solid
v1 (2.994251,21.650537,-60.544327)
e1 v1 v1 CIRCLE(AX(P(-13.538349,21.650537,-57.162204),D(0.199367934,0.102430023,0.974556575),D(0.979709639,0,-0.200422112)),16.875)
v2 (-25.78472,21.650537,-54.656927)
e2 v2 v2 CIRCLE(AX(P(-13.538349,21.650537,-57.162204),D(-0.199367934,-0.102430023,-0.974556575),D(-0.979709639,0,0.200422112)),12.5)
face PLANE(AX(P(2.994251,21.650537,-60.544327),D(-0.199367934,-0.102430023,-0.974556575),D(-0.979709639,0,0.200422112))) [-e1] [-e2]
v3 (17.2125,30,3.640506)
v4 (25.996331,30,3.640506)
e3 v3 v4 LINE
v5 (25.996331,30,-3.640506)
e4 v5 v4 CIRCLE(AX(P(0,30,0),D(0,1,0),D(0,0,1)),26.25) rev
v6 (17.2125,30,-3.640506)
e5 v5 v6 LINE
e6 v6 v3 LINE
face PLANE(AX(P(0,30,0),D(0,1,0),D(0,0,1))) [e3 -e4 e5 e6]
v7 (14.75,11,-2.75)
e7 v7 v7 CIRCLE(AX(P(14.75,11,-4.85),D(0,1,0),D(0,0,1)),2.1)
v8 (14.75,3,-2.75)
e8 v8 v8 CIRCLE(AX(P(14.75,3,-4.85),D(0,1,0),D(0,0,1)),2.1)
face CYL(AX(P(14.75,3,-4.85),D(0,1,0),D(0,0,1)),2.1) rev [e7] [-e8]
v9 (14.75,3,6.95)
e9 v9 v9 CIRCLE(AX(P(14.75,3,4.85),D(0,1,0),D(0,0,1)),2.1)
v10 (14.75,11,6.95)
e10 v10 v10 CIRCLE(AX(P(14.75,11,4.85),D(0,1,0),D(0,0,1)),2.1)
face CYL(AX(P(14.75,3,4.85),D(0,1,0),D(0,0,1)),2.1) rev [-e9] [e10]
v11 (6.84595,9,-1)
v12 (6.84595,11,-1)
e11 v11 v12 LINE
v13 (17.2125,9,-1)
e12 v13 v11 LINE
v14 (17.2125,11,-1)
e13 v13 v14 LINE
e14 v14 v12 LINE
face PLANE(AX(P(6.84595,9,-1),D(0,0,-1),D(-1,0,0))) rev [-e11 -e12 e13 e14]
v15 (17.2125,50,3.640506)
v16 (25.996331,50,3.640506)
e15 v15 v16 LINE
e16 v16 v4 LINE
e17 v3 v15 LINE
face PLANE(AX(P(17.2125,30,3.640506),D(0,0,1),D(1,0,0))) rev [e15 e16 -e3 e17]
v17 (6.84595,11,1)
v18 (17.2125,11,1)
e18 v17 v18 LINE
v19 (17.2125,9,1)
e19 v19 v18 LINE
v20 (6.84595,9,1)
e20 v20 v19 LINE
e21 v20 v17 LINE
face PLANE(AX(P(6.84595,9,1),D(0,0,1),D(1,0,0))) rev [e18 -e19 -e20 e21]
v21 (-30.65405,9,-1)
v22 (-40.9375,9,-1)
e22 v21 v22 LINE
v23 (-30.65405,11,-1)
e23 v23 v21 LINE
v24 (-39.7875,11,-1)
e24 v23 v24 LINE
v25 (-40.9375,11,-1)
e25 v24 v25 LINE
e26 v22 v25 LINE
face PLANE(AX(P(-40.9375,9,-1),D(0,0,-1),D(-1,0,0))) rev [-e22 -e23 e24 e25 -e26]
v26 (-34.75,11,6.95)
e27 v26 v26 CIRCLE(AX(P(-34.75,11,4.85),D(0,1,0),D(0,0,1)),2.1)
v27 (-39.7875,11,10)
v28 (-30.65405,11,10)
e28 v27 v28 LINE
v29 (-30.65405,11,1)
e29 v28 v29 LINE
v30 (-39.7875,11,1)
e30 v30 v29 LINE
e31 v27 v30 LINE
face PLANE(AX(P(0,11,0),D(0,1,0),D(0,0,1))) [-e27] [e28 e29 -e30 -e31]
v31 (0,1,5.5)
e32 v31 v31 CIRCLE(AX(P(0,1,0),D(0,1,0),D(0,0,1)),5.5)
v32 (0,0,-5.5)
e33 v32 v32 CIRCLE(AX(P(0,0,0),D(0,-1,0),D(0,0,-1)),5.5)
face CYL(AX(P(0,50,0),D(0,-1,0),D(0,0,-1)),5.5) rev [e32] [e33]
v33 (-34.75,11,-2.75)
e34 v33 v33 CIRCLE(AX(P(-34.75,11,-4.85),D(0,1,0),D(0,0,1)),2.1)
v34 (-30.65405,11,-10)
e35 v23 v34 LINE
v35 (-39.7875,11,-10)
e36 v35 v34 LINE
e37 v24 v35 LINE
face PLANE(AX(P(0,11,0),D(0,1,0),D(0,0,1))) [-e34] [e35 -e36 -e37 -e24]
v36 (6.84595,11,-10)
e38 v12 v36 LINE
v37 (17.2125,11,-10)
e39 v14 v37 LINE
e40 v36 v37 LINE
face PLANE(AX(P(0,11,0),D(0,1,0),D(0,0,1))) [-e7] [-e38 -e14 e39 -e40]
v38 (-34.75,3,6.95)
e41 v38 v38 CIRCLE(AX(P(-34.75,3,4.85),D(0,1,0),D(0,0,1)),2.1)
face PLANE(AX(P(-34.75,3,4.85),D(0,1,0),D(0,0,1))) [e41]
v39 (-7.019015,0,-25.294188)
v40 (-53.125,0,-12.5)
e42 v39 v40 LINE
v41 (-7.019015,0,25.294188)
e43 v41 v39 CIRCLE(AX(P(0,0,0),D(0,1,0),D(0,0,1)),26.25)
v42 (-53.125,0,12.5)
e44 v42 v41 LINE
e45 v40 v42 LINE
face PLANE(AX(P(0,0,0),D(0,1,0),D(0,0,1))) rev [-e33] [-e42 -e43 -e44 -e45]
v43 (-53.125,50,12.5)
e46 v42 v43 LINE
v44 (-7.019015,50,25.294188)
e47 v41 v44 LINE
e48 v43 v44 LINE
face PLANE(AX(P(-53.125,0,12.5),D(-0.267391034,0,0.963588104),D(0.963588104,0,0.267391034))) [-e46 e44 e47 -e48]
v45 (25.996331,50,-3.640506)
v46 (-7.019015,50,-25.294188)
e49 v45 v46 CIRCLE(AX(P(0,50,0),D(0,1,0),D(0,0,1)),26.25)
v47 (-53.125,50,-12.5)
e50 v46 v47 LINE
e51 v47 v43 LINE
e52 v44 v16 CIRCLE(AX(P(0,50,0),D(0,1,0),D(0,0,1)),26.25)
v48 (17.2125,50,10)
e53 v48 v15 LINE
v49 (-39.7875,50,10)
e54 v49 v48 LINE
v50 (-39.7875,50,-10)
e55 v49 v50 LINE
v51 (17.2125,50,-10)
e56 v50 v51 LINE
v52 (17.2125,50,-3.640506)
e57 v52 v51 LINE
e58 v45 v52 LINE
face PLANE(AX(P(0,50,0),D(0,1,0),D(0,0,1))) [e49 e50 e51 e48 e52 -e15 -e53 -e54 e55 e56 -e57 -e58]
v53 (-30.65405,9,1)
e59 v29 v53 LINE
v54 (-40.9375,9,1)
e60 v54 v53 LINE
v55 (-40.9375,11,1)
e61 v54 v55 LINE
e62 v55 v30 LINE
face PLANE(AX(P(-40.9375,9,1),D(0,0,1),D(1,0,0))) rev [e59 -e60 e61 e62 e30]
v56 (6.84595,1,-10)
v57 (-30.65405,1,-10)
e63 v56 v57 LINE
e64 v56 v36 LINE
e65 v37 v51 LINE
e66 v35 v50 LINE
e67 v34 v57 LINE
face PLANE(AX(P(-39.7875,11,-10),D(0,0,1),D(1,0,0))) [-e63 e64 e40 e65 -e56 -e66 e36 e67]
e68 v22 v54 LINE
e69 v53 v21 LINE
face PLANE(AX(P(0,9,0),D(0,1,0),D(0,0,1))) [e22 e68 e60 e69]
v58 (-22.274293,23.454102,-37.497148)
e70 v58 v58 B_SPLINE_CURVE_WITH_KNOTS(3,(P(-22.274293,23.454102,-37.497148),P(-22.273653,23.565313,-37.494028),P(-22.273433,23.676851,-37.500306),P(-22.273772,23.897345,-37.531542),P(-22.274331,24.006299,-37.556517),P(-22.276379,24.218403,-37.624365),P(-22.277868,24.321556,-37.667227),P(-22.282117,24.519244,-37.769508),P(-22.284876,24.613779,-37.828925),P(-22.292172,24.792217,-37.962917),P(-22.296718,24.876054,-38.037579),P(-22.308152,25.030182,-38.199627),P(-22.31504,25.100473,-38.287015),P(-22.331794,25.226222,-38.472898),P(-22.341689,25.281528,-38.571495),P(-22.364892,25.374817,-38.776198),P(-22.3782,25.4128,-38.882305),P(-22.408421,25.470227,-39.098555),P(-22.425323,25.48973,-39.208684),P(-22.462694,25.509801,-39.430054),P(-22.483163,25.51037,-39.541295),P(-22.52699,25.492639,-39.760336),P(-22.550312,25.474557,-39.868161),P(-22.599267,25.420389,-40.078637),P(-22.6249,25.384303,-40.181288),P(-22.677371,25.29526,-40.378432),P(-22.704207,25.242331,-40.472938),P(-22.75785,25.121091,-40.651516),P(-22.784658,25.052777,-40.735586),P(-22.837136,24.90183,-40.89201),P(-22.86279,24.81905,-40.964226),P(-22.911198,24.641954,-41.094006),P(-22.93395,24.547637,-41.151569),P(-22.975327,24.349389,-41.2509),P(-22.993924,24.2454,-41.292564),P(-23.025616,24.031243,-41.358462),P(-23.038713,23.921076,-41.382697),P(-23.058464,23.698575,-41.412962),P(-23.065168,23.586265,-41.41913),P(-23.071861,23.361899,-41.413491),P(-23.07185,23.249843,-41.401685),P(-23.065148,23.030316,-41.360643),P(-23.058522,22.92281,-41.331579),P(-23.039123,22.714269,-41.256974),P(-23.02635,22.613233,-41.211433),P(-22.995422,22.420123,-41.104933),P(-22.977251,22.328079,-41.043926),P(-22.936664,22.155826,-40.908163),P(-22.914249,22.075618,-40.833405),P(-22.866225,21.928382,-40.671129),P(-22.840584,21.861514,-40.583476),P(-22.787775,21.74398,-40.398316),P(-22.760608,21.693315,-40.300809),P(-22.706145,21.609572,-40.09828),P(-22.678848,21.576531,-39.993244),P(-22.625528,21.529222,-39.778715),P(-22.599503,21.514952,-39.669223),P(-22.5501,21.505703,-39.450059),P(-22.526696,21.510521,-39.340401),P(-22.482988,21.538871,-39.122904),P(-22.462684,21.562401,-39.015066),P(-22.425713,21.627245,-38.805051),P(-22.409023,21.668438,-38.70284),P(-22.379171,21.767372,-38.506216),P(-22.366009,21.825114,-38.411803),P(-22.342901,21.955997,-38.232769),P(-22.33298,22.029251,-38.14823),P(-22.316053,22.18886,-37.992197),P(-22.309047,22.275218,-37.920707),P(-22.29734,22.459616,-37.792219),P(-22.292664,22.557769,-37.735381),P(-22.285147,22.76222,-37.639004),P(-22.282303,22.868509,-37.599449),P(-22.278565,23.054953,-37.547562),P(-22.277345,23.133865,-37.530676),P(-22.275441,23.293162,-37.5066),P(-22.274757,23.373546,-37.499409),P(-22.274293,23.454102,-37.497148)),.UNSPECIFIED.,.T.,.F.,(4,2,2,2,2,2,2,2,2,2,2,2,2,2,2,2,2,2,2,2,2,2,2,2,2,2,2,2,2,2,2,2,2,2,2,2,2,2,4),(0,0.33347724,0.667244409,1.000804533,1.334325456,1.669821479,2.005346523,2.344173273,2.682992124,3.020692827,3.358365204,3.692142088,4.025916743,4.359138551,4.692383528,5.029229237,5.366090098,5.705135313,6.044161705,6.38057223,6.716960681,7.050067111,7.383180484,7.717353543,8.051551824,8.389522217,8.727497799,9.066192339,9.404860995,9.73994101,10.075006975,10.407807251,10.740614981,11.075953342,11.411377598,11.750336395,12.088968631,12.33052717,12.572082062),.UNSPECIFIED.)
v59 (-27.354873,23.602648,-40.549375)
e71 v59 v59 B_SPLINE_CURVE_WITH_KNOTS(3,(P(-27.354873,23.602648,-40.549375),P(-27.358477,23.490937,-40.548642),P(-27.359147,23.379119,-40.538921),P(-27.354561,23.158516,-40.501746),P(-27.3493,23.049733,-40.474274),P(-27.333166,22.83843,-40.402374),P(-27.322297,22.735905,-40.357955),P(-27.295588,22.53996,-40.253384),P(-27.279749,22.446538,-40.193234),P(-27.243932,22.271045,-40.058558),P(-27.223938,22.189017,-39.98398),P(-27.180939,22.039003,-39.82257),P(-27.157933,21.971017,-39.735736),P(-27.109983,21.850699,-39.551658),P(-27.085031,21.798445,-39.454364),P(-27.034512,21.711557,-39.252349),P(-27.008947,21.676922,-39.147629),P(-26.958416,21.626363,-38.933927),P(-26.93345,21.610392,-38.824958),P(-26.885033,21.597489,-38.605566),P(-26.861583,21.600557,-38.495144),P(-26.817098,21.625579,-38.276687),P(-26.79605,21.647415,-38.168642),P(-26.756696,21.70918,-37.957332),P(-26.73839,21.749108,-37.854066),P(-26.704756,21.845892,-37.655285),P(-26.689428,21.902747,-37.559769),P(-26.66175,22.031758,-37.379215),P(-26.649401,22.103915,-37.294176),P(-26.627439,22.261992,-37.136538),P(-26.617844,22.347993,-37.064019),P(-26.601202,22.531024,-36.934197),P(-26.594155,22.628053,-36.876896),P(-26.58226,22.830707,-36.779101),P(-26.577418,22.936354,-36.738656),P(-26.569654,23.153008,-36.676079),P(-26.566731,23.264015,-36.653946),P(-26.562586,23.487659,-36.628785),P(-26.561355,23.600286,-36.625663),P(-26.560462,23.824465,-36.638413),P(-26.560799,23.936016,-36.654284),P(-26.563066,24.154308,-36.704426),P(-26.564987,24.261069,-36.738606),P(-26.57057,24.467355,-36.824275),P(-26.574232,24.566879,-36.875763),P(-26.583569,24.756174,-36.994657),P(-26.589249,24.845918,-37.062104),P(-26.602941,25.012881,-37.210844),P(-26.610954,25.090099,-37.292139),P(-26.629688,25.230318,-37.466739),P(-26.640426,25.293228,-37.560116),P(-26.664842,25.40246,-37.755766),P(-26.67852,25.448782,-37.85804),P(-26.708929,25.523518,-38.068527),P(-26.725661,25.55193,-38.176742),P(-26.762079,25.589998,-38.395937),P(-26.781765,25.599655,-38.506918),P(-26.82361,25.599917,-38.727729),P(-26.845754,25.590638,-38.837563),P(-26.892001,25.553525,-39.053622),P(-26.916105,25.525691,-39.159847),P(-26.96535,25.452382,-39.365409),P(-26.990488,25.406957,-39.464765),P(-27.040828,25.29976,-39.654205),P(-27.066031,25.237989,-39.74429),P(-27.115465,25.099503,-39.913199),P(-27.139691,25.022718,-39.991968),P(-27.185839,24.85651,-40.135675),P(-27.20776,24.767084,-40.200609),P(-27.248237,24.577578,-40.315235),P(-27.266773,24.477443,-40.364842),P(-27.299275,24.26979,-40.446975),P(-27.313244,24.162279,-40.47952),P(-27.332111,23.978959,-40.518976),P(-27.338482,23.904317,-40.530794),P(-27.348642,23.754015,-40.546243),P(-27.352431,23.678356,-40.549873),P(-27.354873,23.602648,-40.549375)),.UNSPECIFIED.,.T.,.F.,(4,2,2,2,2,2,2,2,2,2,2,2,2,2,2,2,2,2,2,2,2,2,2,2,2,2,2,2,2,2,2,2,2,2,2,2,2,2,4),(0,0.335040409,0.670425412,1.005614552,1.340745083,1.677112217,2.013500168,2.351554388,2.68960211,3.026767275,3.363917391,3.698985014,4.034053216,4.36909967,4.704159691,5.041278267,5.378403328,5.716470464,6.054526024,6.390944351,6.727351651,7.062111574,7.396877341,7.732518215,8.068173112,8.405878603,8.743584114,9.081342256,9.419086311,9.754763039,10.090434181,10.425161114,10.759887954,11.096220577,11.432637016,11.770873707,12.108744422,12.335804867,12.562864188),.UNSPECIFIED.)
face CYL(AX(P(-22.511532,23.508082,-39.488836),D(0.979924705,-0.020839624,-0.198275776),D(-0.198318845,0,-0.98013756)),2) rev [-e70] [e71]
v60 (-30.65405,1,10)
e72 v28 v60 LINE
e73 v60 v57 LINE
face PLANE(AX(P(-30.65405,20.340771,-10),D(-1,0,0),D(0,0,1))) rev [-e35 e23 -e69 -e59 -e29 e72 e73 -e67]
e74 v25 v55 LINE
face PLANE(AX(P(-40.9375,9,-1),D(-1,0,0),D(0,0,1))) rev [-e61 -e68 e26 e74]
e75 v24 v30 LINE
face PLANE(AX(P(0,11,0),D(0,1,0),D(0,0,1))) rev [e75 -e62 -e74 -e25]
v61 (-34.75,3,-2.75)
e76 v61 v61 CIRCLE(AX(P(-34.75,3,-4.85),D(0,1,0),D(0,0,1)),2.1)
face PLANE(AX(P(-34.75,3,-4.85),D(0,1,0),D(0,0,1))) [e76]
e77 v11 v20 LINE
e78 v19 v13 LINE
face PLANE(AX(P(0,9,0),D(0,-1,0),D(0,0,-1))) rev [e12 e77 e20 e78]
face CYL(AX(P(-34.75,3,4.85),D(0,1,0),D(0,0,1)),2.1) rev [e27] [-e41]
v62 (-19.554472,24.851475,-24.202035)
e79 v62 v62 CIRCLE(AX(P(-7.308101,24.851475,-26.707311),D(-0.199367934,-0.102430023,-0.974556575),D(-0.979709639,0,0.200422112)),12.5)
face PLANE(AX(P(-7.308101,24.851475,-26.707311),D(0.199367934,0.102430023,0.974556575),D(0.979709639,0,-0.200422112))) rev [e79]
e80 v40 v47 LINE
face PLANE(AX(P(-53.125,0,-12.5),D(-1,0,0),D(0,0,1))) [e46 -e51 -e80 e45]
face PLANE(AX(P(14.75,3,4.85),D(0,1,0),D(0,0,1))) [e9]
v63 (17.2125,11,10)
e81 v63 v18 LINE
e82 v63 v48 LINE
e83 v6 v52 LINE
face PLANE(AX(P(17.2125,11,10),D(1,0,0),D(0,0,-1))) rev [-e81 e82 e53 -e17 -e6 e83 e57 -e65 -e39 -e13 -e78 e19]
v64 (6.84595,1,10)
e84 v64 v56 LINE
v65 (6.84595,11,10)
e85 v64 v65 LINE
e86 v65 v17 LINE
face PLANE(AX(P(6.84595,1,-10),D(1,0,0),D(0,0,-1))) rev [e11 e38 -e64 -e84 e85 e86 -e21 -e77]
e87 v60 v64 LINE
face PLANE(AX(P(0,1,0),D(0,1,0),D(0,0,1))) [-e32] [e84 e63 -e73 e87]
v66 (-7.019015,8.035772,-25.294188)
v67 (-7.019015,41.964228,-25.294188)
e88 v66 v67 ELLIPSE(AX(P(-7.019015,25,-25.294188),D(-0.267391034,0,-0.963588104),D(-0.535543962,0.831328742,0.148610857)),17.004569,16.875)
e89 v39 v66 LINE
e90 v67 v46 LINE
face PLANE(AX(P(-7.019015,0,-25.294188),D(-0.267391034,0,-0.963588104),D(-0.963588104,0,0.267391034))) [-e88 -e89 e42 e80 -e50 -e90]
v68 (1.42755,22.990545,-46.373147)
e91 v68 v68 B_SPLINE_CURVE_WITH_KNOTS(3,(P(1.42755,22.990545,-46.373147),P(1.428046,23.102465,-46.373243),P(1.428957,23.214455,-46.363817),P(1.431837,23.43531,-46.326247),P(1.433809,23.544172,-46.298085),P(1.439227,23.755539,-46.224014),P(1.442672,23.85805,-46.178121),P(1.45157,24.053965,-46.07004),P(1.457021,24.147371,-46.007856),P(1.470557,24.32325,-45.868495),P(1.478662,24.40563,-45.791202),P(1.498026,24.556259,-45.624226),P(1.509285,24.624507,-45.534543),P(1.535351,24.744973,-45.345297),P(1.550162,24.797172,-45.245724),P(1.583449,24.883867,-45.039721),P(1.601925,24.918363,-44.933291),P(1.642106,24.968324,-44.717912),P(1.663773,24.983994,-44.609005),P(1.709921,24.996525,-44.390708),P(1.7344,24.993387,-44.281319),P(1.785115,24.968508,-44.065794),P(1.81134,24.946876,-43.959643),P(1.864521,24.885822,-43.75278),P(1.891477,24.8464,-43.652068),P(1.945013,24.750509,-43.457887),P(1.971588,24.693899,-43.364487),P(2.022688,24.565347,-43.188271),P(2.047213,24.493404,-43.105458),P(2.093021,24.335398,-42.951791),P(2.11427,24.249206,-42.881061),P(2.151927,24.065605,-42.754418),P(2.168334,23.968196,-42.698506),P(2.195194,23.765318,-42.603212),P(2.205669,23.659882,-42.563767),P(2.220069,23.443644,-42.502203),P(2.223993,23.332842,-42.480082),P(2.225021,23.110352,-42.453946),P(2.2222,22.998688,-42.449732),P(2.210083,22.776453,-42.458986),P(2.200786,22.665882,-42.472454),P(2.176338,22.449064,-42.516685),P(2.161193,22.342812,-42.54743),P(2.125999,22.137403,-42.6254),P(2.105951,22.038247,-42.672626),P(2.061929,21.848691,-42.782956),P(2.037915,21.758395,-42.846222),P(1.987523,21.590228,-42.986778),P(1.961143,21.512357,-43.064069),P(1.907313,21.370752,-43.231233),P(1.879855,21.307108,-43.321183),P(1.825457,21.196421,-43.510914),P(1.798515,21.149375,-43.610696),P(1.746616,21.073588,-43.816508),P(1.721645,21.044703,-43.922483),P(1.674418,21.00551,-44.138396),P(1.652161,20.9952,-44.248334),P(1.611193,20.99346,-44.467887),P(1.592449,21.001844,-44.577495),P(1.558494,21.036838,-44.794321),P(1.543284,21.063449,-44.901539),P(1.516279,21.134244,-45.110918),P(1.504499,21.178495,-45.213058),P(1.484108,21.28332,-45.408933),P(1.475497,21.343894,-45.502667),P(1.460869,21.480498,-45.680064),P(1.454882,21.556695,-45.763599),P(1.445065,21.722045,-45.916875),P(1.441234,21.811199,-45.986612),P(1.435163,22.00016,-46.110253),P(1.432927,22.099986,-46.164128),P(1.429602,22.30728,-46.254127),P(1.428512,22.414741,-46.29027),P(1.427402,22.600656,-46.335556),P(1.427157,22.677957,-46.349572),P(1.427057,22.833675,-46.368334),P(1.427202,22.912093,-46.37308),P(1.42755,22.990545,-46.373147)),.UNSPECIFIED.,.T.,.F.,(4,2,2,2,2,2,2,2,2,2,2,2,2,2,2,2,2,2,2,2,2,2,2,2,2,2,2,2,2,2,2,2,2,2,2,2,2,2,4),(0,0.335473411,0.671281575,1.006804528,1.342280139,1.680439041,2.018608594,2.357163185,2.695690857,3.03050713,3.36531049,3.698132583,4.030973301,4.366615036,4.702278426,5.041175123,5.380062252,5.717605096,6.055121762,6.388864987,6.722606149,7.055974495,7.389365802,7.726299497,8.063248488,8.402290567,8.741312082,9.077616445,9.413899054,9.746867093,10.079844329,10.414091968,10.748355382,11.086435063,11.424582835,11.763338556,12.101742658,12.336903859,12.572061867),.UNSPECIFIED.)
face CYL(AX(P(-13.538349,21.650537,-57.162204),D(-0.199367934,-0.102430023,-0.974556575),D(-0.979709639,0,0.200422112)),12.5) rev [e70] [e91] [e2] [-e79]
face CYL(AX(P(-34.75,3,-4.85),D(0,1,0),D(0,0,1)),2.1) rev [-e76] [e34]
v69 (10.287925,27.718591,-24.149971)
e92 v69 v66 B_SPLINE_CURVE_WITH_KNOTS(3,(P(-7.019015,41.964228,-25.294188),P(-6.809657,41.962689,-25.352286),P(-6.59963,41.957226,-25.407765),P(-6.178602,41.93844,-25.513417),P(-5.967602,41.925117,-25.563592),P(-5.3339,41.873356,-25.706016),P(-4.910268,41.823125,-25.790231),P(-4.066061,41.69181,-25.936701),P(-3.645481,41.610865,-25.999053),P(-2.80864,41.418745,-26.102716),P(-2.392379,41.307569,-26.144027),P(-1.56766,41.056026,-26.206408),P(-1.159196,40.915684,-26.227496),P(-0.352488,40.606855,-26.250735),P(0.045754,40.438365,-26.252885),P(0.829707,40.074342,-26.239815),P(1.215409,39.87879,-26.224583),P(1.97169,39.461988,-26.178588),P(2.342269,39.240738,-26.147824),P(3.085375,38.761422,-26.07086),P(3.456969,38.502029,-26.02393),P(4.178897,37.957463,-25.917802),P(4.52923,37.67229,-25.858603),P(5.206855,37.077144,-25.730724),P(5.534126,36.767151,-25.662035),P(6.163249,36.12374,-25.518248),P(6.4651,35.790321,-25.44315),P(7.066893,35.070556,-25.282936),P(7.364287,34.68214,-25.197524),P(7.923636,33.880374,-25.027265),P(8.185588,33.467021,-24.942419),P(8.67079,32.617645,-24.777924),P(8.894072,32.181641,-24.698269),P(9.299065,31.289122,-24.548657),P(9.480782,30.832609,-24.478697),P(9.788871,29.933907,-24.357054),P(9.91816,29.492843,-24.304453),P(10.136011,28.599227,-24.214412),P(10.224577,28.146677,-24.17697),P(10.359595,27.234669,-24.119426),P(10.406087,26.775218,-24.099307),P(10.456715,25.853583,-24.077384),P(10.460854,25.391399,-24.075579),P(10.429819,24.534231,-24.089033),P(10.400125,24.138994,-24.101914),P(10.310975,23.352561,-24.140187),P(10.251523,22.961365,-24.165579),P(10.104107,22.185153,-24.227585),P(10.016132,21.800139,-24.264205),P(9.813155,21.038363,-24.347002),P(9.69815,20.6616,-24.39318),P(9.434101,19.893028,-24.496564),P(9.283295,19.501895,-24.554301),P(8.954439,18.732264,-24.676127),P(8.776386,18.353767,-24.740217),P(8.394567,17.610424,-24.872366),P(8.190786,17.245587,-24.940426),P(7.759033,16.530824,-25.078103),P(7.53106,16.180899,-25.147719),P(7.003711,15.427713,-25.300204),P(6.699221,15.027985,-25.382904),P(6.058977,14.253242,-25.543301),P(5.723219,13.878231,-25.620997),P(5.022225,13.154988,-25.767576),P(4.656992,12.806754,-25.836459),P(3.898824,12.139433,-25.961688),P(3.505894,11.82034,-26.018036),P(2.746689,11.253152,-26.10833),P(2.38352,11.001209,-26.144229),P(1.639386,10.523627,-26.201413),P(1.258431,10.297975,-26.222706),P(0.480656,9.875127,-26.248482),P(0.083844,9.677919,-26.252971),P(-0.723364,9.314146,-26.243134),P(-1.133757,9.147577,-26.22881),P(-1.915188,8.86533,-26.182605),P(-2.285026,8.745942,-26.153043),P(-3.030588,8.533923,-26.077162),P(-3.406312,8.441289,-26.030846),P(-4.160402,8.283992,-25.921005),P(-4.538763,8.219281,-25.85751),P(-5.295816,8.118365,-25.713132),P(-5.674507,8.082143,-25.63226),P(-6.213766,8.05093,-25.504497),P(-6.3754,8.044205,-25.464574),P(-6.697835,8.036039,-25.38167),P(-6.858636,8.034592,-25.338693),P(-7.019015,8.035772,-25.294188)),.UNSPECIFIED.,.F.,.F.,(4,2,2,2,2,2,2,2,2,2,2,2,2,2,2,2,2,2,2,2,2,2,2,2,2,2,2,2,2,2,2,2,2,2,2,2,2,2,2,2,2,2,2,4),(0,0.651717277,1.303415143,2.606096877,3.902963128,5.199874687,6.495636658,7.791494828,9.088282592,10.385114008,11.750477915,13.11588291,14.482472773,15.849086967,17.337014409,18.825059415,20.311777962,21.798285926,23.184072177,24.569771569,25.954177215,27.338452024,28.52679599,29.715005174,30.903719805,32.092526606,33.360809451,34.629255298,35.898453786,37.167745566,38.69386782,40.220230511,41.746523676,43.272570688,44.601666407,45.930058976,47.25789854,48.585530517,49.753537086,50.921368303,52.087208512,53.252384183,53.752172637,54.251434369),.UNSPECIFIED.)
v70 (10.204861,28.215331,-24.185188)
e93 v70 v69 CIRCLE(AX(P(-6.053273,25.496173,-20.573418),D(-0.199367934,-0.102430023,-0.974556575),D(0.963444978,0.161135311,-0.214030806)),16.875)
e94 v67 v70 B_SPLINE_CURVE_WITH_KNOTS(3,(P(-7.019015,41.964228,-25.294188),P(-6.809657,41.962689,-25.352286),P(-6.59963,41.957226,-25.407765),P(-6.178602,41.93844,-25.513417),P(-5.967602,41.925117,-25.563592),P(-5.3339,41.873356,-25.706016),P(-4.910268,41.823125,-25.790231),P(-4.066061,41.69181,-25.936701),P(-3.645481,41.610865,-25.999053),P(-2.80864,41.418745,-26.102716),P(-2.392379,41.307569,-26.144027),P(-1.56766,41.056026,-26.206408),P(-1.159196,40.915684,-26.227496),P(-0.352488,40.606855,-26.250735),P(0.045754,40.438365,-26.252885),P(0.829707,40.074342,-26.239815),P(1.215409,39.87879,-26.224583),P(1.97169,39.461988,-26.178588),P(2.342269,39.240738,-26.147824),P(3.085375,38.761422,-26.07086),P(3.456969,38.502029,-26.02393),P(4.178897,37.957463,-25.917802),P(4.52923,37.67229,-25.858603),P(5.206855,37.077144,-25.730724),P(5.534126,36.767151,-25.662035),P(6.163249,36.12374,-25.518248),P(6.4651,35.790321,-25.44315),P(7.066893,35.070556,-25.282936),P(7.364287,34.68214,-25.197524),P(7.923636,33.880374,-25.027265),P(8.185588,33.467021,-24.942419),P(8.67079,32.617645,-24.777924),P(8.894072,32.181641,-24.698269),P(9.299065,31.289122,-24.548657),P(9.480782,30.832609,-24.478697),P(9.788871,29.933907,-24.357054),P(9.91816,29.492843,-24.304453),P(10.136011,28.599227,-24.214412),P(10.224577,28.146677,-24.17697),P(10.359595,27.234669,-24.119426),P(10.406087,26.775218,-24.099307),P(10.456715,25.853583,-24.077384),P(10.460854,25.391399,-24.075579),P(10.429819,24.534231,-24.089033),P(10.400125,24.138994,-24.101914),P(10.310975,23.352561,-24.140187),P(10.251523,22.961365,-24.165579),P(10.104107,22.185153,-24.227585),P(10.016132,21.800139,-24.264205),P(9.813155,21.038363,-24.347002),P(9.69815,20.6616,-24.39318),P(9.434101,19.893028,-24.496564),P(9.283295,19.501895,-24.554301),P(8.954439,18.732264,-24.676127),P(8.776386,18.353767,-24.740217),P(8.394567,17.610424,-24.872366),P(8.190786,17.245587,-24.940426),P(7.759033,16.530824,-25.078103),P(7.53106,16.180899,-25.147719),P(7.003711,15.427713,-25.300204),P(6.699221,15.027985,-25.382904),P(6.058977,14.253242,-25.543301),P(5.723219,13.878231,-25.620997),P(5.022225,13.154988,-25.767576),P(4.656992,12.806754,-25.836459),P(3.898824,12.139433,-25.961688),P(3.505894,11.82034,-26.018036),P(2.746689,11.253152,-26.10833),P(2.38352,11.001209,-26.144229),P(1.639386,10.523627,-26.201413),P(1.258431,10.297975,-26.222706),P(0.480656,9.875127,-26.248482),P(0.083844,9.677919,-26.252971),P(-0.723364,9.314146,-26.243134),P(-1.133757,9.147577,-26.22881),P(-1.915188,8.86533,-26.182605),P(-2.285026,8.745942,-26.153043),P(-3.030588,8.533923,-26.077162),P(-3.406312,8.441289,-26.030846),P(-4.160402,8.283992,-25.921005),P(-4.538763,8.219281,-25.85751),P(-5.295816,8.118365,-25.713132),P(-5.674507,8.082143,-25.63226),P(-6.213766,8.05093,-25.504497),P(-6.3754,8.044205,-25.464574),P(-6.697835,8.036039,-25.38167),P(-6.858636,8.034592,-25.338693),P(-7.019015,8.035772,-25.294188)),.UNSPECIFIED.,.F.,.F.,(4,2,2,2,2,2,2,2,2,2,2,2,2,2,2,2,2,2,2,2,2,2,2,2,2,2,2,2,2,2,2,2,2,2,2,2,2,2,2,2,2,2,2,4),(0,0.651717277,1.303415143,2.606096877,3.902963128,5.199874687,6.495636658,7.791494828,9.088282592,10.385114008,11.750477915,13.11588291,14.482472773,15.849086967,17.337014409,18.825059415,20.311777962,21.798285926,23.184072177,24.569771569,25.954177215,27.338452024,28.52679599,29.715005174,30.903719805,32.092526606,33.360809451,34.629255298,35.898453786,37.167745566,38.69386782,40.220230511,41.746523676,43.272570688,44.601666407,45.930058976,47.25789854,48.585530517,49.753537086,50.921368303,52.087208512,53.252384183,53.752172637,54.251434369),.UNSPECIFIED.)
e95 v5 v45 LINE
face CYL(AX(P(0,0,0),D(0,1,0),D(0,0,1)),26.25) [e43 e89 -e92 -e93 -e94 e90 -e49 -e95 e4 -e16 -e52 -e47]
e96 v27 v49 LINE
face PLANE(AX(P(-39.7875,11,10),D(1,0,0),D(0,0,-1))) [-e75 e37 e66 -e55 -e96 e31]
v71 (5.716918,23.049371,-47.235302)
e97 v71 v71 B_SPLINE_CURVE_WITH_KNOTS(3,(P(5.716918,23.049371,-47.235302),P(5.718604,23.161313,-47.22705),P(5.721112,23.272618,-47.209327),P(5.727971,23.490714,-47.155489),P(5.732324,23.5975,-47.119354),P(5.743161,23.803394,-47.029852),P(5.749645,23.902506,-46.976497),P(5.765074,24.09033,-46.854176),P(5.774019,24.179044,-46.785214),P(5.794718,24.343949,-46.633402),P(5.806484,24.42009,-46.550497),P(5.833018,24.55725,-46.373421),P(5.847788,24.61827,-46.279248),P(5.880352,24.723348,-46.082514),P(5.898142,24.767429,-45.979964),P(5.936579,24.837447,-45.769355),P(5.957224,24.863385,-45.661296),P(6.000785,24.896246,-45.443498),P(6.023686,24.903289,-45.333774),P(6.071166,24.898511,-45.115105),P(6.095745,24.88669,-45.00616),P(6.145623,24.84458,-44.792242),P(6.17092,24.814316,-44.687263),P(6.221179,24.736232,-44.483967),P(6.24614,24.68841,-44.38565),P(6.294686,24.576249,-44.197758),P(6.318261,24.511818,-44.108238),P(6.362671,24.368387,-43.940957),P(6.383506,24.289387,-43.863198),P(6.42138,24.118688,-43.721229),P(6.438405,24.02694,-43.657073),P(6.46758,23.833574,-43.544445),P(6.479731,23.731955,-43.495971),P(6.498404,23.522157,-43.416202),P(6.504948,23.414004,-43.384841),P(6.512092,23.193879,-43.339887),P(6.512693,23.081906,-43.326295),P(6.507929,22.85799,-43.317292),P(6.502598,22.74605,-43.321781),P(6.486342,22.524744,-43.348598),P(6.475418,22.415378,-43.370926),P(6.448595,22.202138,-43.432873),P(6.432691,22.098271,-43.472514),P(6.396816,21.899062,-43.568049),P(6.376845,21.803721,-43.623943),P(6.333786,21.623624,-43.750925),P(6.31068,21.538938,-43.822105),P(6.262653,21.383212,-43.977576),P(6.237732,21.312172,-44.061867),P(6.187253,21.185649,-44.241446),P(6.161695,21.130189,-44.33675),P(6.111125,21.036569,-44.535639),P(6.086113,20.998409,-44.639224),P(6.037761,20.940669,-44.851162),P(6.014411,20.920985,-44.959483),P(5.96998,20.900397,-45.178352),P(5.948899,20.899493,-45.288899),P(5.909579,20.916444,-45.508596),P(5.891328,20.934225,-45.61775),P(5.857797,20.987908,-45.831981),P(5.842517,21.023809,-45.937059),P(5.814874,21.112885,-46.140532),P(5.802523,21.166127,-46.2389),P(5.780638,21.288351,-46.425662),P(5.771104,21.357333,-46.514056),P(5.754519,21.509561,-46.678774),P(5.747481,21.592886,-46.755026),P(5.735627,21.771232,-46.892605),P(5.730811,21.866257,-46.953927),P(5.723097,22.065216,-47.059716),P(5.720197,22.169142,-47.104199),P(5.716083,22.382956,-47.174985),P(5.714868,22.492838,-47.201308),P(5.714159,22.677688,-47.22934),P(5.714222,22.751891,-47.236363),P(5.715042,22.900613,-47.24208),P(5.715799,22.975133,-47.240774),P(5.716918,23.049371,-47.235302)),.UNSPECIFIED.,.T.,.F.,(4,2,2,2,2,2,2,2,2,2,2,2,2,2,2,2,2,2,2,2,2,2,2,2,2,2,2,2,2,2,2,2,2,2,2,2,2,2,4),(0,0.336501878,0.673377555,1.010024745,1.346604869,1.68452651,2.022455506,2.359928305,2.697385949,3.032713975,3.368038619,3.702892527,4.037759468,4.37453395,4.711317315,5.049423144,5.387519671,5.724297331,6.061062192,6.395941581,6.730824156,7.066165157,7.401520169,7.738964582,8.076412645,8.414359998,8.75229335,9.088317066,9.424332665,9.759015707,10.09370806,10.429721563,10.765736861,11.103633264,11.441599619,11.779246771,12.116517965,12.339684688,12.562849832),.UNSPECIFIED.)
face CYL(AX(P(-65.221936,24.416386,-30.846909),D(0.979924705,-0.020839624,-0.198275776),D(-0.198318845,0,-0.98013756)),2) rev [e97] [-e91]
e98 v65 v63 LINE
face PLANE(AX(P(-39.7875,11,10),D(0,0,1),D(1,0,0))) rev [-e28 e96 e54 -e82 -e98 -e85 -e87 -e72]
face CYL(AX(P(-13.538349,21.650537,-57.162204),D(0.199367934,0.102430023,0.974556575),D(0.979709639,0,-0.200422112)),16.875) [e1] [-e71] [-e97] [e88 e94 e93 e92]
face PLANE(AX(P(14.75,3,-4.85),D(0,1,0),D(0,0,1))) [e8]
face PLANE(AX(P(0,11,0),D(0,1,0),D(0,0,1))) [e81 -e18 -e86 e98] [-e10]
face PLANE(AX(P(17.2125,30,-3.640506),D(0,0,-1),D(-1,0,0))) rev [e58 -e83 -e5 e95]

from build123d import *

# Parameters (mm, degrees)
BOSS_EXTRUDE1_DEPTH       = 40
REVOLVE1_START            = -44.95139953
REVOLVE1_OUTLINE_R        = 13.5
REVOLVE1_DEPTH            = 30.829897511
M18_CLEARANCE_HOLE1_D     = 20
M18_CLEARANCE_HOLE1_DEPTH = 25
SKETCH9_W                 = 1.6
SKETCH9_H                 = 27
CUT_EXTRUDE4_DEPTH        = 76.299241718
CUT_EXTRUDE4_DEPTH_BACK   = 76.299241718
SKETCH18_R                = 1.6
SCALE2_SCALE              = 1.25
SKETCH19_W                = 57
SKETCH19_H                = 20
CUT_EXTRUDE5_DEPTH        = 39
SKETCH20_W                = 40
SKETCH20_H                = 20
CUT_EXTRUDE6_DEPTH        = 10
SKETCH21_R                = 5.5
CUT_EXTRUDE7_DEPTH        = 96.0605556
SKETCH22_W                = 7.783449774
SKETCH22_H                = 2
SKETCH22_W_2              = 10.366550226
CUT_EXTRUDE8_DEPTH        = 2
SKETCH23_W                = 9.71853625
SKETCH23_H                = 7.281011564
CUT_EXTRUDE9_DEPTH        = 20
SKETCH25_W                = 2.5
SKETCH25_H                = 9
BOSS_EXTRUDE3_DEPTH       = 10
SKETCH26_W                = 2.5
SKETCH26_H                = 2
BOSS_EXTRUDE4_DEPTH       = 8
SKETCH27_R                = 2.1
CUT_EXTRUDE10_DEPTH       = 8


with BuildPart() as part:
    # Sketch1 → Boss-Extrude1 (new body)
    with BuildSketch(Plane(origin=(0, 40, 0), x_dir=(1, 0, 0), z_dir=(0, 1, 0))):
        with BuildLine():
            Line((-5.61521172, 20.235350191), (-42.5, 10))
            Line((-42.5, 10), (-42.5, -10))
            Line((-42.5, -10), (-5.61521172, -20.235350191))
            ThreePointArc((-5.61521172, -20.235350191), (21, 0), (-5.61521172, 20.235350191))
        make_face()
    extrude(amount=-BOSS_EXTRUDE1_DEPTH)

    # Revolve1: read off the stored shape, not the designer's step
    # Revolve1 outline → Revolve1 (add)
    with BuildSketch(Plane(origin=(0, 0, 0), x_dir=(0.9799247046208294, -0.02083962380947531, -0.19827577601224947), z_dir=(0.19936793441719802, 0.10243002349202102, 0.9745565745577031)).offset(REVOLVE1_START)):
        with Locations((-1.9070974, 22.005607966)):
            Circle(REVOLVE1_OUTLINE_R)
    extrude(amount=REVOLVE1_DEPTH)

    # M18 Clearance Hole1
    with Locations(Plane(origin=(-8.961867673, -4.60437291, -43.807681948), x_dir=(-0.9799247046208296, 0.02083962380947534, 0.19827577601224922), z_dir=(-0.19936793441719777, -0.10243002349202121, -0.9745565745577032))):
        with Locations((1.9070974, 22.005607966)):
            Hole(M18_CLEARANCE_HOLE1_D / 2, depth=M18_CLEARANCE_HOLE1_DEPTH)

    # Sketch9 → M3.5 Clearance Hole1 (revolve, cut)
    with BuildSketch(Plane(origin=(-18.009225855, 18.806465846, -31.591069121), x_dir=(-0.12392681772022805, 0.7153744254872676, -0.6876638533531477), z_dir=(0.1561720753640579, 0.6984304843277114, 0.6984304843277114))):
        with Locations((0.8, 13.5)):
            Rectangle(SKETCH9_W, SKETCH9_H)
    revolve(axis=Axis((-11.78670398, 18.674134235, -32.850120299), (-0.9799247046208297, 0.020839623809475325, 0.19827577601224802)), mode=Mode.SUBTRACT)

    # Sketch18 → Cut-Extrude4 (cut, two sides: drawn at the far end of the back side and taken through both)
    with BuildSketch(Plane(origin=(-1.740210315, 0.03700828, 0.352110268), x_dir=(-0.19823095447813932, 0.004215689735382395, -0.9801462730872066), z_dir=(0.9799247046208297, -0.020839623809475356, -0.19827577601224802)).offset(-CUT_EXTRUDE4_DEPTH_BACK)):
        with Locations(Location((34.613136918, 18.419306886, 0), (0, 0, 359.758405588))):
            Circle(SKETCH18_R)
    extrude(amount=CUT_EXTRUDE4_DEPTH + CUT_EXTRUDE4_DEPTH_BACK, mode=Mode.SUBTRACT)


with BuildPart() as part_1:
    # Scale2: scaled about (0, 0, 0)
    add(part.part.scale(SCALE2_SCALE))

    # Sketch19 → Cut-Extrude5 (cut)
    with BuildSketch(Plane(origin=(0, 50, 0), x_dir=(1, 0, 0), z_dir=(0, 1, 0))):
        with Locations((-11.2875, 0)):
            Rectangle(SKETCH19_W, SKETCH19_H)
    extrude(amount=-CUT_EXTRUDE5_DEPTH, mode=Mode.SUBTRACT)

    # Sketch20 → Cut-Extrude6 (cut)
    with BuildSketch(Plane(origin=(0, 11, 0), x_dir=(1, 0, 0), z_dir=(0, 1, 0))):
        with Locations((-13.154050226, 0)):
            Rectangle(SKETCH20_W, SKETCH20_H)
    extrude(amount=-CUT_EXTRUDE6_DEPTH, mode=Mode.SUBTRACT)

    # Sketch21 → Cut-Extrude7 (cut, through all)
    with BuildSketch(Plane.XZ):
        with Locations(Location((0, 0, 0), (0, 0, 270))):
            Circle(SKETCH21_R)
    extrude(amount=-CUT_EXTRUDE7_DEPTH, mode=Mode.SUBTRACT)

    # Sketch22 → Cut-Extrude8 (cut)
    with BuildSketch(Plane(origin=(0, 11, 0), x_dir=(1, 0, 0), z_dir=(0, 1, 0))):
        with Locations((-37.045775113, 0)):
            Rectangle(SKETCH22_W, SKETCH22_H)
        with Locations((12.029224887, 0)):
            Rectangle(SKETCH22_W_2, SKETCH22_H)
    extrude(amount=-CUT_EXTRUDE8_DEPTH, mode=Mode.SUBTRACT)

    # Sketch23 → Cut-Extrude9 (cut)
    with BuildSketch(Plane(origin=(0, 50, 0), x_dir=(1, 0, 0), z_dir=(0, 1, 0))):
        with Locations((22.071768125, 0)):
            Rectangle(SKETCH23_W, SKETCH23_H)
    extrude(amount=-CUT_EXTRUDE9_DEPTH, mode=Mode.SUBTRACT)

    # Sketch25 → Boss-Extrude3 (add)
    with BuildSketch(Plane(origin=(0, 1, 0), x_dir=(1, 0, 0), z_dir=(0, 1, 0))):
        with Locations((-31.904050226, 5.5)):
            Rectangle(SKETCH25_W, SKETCH25_H)
        with Locations((-31.904050226, -5.5)):
            Rectangle(SKETCH25_W, SKETCH25_H)
    extrude(amount=BOSS_EXTRUDE3_DEPTH)

    # Sketch26 → Boss-Extrude4 (add)
    with BuildSketch(Plane(origin=(0, 1, 0), x_dir=(1, 0, 0), z_dir=(0, 1, 0))):
        with Locations((-31.904050226, 0)):
            Rectangle(SKETCH26_W, SKETCH26_H)
    extrude(amount=BOSS_EXTRUDE4_DEPTH)

    # Sketch27 → Cut-Extrude10 (cut)
    with BuildSketch(Plane(origin=(0, 11, 0), x_dir=(1, 0, 0), z_dir=(0, 1, 0))):
        with Locations(Location((14.75, 4.85, 0), (0, 0, 270))):
            Circle(SKETCH27_R)
        with Locations(Location((14.75, -4.85, 0), (0, 0, 270))):
            Circle(SKETCH27_R)
        with Locations(Location((-34.75, 4.85, 0), (0, 0, 270))):
            Circle(SKETCH27_R)
        with Locations(Location((-34.75, -4.85, 0), (0, 0, 270))):
            Circle(SKETCH27_R)
    extrude(amount=-CUT_EXTRUDE10_DEPTH, mode=Mode.SUBTRACT)


solid = part_1.part
